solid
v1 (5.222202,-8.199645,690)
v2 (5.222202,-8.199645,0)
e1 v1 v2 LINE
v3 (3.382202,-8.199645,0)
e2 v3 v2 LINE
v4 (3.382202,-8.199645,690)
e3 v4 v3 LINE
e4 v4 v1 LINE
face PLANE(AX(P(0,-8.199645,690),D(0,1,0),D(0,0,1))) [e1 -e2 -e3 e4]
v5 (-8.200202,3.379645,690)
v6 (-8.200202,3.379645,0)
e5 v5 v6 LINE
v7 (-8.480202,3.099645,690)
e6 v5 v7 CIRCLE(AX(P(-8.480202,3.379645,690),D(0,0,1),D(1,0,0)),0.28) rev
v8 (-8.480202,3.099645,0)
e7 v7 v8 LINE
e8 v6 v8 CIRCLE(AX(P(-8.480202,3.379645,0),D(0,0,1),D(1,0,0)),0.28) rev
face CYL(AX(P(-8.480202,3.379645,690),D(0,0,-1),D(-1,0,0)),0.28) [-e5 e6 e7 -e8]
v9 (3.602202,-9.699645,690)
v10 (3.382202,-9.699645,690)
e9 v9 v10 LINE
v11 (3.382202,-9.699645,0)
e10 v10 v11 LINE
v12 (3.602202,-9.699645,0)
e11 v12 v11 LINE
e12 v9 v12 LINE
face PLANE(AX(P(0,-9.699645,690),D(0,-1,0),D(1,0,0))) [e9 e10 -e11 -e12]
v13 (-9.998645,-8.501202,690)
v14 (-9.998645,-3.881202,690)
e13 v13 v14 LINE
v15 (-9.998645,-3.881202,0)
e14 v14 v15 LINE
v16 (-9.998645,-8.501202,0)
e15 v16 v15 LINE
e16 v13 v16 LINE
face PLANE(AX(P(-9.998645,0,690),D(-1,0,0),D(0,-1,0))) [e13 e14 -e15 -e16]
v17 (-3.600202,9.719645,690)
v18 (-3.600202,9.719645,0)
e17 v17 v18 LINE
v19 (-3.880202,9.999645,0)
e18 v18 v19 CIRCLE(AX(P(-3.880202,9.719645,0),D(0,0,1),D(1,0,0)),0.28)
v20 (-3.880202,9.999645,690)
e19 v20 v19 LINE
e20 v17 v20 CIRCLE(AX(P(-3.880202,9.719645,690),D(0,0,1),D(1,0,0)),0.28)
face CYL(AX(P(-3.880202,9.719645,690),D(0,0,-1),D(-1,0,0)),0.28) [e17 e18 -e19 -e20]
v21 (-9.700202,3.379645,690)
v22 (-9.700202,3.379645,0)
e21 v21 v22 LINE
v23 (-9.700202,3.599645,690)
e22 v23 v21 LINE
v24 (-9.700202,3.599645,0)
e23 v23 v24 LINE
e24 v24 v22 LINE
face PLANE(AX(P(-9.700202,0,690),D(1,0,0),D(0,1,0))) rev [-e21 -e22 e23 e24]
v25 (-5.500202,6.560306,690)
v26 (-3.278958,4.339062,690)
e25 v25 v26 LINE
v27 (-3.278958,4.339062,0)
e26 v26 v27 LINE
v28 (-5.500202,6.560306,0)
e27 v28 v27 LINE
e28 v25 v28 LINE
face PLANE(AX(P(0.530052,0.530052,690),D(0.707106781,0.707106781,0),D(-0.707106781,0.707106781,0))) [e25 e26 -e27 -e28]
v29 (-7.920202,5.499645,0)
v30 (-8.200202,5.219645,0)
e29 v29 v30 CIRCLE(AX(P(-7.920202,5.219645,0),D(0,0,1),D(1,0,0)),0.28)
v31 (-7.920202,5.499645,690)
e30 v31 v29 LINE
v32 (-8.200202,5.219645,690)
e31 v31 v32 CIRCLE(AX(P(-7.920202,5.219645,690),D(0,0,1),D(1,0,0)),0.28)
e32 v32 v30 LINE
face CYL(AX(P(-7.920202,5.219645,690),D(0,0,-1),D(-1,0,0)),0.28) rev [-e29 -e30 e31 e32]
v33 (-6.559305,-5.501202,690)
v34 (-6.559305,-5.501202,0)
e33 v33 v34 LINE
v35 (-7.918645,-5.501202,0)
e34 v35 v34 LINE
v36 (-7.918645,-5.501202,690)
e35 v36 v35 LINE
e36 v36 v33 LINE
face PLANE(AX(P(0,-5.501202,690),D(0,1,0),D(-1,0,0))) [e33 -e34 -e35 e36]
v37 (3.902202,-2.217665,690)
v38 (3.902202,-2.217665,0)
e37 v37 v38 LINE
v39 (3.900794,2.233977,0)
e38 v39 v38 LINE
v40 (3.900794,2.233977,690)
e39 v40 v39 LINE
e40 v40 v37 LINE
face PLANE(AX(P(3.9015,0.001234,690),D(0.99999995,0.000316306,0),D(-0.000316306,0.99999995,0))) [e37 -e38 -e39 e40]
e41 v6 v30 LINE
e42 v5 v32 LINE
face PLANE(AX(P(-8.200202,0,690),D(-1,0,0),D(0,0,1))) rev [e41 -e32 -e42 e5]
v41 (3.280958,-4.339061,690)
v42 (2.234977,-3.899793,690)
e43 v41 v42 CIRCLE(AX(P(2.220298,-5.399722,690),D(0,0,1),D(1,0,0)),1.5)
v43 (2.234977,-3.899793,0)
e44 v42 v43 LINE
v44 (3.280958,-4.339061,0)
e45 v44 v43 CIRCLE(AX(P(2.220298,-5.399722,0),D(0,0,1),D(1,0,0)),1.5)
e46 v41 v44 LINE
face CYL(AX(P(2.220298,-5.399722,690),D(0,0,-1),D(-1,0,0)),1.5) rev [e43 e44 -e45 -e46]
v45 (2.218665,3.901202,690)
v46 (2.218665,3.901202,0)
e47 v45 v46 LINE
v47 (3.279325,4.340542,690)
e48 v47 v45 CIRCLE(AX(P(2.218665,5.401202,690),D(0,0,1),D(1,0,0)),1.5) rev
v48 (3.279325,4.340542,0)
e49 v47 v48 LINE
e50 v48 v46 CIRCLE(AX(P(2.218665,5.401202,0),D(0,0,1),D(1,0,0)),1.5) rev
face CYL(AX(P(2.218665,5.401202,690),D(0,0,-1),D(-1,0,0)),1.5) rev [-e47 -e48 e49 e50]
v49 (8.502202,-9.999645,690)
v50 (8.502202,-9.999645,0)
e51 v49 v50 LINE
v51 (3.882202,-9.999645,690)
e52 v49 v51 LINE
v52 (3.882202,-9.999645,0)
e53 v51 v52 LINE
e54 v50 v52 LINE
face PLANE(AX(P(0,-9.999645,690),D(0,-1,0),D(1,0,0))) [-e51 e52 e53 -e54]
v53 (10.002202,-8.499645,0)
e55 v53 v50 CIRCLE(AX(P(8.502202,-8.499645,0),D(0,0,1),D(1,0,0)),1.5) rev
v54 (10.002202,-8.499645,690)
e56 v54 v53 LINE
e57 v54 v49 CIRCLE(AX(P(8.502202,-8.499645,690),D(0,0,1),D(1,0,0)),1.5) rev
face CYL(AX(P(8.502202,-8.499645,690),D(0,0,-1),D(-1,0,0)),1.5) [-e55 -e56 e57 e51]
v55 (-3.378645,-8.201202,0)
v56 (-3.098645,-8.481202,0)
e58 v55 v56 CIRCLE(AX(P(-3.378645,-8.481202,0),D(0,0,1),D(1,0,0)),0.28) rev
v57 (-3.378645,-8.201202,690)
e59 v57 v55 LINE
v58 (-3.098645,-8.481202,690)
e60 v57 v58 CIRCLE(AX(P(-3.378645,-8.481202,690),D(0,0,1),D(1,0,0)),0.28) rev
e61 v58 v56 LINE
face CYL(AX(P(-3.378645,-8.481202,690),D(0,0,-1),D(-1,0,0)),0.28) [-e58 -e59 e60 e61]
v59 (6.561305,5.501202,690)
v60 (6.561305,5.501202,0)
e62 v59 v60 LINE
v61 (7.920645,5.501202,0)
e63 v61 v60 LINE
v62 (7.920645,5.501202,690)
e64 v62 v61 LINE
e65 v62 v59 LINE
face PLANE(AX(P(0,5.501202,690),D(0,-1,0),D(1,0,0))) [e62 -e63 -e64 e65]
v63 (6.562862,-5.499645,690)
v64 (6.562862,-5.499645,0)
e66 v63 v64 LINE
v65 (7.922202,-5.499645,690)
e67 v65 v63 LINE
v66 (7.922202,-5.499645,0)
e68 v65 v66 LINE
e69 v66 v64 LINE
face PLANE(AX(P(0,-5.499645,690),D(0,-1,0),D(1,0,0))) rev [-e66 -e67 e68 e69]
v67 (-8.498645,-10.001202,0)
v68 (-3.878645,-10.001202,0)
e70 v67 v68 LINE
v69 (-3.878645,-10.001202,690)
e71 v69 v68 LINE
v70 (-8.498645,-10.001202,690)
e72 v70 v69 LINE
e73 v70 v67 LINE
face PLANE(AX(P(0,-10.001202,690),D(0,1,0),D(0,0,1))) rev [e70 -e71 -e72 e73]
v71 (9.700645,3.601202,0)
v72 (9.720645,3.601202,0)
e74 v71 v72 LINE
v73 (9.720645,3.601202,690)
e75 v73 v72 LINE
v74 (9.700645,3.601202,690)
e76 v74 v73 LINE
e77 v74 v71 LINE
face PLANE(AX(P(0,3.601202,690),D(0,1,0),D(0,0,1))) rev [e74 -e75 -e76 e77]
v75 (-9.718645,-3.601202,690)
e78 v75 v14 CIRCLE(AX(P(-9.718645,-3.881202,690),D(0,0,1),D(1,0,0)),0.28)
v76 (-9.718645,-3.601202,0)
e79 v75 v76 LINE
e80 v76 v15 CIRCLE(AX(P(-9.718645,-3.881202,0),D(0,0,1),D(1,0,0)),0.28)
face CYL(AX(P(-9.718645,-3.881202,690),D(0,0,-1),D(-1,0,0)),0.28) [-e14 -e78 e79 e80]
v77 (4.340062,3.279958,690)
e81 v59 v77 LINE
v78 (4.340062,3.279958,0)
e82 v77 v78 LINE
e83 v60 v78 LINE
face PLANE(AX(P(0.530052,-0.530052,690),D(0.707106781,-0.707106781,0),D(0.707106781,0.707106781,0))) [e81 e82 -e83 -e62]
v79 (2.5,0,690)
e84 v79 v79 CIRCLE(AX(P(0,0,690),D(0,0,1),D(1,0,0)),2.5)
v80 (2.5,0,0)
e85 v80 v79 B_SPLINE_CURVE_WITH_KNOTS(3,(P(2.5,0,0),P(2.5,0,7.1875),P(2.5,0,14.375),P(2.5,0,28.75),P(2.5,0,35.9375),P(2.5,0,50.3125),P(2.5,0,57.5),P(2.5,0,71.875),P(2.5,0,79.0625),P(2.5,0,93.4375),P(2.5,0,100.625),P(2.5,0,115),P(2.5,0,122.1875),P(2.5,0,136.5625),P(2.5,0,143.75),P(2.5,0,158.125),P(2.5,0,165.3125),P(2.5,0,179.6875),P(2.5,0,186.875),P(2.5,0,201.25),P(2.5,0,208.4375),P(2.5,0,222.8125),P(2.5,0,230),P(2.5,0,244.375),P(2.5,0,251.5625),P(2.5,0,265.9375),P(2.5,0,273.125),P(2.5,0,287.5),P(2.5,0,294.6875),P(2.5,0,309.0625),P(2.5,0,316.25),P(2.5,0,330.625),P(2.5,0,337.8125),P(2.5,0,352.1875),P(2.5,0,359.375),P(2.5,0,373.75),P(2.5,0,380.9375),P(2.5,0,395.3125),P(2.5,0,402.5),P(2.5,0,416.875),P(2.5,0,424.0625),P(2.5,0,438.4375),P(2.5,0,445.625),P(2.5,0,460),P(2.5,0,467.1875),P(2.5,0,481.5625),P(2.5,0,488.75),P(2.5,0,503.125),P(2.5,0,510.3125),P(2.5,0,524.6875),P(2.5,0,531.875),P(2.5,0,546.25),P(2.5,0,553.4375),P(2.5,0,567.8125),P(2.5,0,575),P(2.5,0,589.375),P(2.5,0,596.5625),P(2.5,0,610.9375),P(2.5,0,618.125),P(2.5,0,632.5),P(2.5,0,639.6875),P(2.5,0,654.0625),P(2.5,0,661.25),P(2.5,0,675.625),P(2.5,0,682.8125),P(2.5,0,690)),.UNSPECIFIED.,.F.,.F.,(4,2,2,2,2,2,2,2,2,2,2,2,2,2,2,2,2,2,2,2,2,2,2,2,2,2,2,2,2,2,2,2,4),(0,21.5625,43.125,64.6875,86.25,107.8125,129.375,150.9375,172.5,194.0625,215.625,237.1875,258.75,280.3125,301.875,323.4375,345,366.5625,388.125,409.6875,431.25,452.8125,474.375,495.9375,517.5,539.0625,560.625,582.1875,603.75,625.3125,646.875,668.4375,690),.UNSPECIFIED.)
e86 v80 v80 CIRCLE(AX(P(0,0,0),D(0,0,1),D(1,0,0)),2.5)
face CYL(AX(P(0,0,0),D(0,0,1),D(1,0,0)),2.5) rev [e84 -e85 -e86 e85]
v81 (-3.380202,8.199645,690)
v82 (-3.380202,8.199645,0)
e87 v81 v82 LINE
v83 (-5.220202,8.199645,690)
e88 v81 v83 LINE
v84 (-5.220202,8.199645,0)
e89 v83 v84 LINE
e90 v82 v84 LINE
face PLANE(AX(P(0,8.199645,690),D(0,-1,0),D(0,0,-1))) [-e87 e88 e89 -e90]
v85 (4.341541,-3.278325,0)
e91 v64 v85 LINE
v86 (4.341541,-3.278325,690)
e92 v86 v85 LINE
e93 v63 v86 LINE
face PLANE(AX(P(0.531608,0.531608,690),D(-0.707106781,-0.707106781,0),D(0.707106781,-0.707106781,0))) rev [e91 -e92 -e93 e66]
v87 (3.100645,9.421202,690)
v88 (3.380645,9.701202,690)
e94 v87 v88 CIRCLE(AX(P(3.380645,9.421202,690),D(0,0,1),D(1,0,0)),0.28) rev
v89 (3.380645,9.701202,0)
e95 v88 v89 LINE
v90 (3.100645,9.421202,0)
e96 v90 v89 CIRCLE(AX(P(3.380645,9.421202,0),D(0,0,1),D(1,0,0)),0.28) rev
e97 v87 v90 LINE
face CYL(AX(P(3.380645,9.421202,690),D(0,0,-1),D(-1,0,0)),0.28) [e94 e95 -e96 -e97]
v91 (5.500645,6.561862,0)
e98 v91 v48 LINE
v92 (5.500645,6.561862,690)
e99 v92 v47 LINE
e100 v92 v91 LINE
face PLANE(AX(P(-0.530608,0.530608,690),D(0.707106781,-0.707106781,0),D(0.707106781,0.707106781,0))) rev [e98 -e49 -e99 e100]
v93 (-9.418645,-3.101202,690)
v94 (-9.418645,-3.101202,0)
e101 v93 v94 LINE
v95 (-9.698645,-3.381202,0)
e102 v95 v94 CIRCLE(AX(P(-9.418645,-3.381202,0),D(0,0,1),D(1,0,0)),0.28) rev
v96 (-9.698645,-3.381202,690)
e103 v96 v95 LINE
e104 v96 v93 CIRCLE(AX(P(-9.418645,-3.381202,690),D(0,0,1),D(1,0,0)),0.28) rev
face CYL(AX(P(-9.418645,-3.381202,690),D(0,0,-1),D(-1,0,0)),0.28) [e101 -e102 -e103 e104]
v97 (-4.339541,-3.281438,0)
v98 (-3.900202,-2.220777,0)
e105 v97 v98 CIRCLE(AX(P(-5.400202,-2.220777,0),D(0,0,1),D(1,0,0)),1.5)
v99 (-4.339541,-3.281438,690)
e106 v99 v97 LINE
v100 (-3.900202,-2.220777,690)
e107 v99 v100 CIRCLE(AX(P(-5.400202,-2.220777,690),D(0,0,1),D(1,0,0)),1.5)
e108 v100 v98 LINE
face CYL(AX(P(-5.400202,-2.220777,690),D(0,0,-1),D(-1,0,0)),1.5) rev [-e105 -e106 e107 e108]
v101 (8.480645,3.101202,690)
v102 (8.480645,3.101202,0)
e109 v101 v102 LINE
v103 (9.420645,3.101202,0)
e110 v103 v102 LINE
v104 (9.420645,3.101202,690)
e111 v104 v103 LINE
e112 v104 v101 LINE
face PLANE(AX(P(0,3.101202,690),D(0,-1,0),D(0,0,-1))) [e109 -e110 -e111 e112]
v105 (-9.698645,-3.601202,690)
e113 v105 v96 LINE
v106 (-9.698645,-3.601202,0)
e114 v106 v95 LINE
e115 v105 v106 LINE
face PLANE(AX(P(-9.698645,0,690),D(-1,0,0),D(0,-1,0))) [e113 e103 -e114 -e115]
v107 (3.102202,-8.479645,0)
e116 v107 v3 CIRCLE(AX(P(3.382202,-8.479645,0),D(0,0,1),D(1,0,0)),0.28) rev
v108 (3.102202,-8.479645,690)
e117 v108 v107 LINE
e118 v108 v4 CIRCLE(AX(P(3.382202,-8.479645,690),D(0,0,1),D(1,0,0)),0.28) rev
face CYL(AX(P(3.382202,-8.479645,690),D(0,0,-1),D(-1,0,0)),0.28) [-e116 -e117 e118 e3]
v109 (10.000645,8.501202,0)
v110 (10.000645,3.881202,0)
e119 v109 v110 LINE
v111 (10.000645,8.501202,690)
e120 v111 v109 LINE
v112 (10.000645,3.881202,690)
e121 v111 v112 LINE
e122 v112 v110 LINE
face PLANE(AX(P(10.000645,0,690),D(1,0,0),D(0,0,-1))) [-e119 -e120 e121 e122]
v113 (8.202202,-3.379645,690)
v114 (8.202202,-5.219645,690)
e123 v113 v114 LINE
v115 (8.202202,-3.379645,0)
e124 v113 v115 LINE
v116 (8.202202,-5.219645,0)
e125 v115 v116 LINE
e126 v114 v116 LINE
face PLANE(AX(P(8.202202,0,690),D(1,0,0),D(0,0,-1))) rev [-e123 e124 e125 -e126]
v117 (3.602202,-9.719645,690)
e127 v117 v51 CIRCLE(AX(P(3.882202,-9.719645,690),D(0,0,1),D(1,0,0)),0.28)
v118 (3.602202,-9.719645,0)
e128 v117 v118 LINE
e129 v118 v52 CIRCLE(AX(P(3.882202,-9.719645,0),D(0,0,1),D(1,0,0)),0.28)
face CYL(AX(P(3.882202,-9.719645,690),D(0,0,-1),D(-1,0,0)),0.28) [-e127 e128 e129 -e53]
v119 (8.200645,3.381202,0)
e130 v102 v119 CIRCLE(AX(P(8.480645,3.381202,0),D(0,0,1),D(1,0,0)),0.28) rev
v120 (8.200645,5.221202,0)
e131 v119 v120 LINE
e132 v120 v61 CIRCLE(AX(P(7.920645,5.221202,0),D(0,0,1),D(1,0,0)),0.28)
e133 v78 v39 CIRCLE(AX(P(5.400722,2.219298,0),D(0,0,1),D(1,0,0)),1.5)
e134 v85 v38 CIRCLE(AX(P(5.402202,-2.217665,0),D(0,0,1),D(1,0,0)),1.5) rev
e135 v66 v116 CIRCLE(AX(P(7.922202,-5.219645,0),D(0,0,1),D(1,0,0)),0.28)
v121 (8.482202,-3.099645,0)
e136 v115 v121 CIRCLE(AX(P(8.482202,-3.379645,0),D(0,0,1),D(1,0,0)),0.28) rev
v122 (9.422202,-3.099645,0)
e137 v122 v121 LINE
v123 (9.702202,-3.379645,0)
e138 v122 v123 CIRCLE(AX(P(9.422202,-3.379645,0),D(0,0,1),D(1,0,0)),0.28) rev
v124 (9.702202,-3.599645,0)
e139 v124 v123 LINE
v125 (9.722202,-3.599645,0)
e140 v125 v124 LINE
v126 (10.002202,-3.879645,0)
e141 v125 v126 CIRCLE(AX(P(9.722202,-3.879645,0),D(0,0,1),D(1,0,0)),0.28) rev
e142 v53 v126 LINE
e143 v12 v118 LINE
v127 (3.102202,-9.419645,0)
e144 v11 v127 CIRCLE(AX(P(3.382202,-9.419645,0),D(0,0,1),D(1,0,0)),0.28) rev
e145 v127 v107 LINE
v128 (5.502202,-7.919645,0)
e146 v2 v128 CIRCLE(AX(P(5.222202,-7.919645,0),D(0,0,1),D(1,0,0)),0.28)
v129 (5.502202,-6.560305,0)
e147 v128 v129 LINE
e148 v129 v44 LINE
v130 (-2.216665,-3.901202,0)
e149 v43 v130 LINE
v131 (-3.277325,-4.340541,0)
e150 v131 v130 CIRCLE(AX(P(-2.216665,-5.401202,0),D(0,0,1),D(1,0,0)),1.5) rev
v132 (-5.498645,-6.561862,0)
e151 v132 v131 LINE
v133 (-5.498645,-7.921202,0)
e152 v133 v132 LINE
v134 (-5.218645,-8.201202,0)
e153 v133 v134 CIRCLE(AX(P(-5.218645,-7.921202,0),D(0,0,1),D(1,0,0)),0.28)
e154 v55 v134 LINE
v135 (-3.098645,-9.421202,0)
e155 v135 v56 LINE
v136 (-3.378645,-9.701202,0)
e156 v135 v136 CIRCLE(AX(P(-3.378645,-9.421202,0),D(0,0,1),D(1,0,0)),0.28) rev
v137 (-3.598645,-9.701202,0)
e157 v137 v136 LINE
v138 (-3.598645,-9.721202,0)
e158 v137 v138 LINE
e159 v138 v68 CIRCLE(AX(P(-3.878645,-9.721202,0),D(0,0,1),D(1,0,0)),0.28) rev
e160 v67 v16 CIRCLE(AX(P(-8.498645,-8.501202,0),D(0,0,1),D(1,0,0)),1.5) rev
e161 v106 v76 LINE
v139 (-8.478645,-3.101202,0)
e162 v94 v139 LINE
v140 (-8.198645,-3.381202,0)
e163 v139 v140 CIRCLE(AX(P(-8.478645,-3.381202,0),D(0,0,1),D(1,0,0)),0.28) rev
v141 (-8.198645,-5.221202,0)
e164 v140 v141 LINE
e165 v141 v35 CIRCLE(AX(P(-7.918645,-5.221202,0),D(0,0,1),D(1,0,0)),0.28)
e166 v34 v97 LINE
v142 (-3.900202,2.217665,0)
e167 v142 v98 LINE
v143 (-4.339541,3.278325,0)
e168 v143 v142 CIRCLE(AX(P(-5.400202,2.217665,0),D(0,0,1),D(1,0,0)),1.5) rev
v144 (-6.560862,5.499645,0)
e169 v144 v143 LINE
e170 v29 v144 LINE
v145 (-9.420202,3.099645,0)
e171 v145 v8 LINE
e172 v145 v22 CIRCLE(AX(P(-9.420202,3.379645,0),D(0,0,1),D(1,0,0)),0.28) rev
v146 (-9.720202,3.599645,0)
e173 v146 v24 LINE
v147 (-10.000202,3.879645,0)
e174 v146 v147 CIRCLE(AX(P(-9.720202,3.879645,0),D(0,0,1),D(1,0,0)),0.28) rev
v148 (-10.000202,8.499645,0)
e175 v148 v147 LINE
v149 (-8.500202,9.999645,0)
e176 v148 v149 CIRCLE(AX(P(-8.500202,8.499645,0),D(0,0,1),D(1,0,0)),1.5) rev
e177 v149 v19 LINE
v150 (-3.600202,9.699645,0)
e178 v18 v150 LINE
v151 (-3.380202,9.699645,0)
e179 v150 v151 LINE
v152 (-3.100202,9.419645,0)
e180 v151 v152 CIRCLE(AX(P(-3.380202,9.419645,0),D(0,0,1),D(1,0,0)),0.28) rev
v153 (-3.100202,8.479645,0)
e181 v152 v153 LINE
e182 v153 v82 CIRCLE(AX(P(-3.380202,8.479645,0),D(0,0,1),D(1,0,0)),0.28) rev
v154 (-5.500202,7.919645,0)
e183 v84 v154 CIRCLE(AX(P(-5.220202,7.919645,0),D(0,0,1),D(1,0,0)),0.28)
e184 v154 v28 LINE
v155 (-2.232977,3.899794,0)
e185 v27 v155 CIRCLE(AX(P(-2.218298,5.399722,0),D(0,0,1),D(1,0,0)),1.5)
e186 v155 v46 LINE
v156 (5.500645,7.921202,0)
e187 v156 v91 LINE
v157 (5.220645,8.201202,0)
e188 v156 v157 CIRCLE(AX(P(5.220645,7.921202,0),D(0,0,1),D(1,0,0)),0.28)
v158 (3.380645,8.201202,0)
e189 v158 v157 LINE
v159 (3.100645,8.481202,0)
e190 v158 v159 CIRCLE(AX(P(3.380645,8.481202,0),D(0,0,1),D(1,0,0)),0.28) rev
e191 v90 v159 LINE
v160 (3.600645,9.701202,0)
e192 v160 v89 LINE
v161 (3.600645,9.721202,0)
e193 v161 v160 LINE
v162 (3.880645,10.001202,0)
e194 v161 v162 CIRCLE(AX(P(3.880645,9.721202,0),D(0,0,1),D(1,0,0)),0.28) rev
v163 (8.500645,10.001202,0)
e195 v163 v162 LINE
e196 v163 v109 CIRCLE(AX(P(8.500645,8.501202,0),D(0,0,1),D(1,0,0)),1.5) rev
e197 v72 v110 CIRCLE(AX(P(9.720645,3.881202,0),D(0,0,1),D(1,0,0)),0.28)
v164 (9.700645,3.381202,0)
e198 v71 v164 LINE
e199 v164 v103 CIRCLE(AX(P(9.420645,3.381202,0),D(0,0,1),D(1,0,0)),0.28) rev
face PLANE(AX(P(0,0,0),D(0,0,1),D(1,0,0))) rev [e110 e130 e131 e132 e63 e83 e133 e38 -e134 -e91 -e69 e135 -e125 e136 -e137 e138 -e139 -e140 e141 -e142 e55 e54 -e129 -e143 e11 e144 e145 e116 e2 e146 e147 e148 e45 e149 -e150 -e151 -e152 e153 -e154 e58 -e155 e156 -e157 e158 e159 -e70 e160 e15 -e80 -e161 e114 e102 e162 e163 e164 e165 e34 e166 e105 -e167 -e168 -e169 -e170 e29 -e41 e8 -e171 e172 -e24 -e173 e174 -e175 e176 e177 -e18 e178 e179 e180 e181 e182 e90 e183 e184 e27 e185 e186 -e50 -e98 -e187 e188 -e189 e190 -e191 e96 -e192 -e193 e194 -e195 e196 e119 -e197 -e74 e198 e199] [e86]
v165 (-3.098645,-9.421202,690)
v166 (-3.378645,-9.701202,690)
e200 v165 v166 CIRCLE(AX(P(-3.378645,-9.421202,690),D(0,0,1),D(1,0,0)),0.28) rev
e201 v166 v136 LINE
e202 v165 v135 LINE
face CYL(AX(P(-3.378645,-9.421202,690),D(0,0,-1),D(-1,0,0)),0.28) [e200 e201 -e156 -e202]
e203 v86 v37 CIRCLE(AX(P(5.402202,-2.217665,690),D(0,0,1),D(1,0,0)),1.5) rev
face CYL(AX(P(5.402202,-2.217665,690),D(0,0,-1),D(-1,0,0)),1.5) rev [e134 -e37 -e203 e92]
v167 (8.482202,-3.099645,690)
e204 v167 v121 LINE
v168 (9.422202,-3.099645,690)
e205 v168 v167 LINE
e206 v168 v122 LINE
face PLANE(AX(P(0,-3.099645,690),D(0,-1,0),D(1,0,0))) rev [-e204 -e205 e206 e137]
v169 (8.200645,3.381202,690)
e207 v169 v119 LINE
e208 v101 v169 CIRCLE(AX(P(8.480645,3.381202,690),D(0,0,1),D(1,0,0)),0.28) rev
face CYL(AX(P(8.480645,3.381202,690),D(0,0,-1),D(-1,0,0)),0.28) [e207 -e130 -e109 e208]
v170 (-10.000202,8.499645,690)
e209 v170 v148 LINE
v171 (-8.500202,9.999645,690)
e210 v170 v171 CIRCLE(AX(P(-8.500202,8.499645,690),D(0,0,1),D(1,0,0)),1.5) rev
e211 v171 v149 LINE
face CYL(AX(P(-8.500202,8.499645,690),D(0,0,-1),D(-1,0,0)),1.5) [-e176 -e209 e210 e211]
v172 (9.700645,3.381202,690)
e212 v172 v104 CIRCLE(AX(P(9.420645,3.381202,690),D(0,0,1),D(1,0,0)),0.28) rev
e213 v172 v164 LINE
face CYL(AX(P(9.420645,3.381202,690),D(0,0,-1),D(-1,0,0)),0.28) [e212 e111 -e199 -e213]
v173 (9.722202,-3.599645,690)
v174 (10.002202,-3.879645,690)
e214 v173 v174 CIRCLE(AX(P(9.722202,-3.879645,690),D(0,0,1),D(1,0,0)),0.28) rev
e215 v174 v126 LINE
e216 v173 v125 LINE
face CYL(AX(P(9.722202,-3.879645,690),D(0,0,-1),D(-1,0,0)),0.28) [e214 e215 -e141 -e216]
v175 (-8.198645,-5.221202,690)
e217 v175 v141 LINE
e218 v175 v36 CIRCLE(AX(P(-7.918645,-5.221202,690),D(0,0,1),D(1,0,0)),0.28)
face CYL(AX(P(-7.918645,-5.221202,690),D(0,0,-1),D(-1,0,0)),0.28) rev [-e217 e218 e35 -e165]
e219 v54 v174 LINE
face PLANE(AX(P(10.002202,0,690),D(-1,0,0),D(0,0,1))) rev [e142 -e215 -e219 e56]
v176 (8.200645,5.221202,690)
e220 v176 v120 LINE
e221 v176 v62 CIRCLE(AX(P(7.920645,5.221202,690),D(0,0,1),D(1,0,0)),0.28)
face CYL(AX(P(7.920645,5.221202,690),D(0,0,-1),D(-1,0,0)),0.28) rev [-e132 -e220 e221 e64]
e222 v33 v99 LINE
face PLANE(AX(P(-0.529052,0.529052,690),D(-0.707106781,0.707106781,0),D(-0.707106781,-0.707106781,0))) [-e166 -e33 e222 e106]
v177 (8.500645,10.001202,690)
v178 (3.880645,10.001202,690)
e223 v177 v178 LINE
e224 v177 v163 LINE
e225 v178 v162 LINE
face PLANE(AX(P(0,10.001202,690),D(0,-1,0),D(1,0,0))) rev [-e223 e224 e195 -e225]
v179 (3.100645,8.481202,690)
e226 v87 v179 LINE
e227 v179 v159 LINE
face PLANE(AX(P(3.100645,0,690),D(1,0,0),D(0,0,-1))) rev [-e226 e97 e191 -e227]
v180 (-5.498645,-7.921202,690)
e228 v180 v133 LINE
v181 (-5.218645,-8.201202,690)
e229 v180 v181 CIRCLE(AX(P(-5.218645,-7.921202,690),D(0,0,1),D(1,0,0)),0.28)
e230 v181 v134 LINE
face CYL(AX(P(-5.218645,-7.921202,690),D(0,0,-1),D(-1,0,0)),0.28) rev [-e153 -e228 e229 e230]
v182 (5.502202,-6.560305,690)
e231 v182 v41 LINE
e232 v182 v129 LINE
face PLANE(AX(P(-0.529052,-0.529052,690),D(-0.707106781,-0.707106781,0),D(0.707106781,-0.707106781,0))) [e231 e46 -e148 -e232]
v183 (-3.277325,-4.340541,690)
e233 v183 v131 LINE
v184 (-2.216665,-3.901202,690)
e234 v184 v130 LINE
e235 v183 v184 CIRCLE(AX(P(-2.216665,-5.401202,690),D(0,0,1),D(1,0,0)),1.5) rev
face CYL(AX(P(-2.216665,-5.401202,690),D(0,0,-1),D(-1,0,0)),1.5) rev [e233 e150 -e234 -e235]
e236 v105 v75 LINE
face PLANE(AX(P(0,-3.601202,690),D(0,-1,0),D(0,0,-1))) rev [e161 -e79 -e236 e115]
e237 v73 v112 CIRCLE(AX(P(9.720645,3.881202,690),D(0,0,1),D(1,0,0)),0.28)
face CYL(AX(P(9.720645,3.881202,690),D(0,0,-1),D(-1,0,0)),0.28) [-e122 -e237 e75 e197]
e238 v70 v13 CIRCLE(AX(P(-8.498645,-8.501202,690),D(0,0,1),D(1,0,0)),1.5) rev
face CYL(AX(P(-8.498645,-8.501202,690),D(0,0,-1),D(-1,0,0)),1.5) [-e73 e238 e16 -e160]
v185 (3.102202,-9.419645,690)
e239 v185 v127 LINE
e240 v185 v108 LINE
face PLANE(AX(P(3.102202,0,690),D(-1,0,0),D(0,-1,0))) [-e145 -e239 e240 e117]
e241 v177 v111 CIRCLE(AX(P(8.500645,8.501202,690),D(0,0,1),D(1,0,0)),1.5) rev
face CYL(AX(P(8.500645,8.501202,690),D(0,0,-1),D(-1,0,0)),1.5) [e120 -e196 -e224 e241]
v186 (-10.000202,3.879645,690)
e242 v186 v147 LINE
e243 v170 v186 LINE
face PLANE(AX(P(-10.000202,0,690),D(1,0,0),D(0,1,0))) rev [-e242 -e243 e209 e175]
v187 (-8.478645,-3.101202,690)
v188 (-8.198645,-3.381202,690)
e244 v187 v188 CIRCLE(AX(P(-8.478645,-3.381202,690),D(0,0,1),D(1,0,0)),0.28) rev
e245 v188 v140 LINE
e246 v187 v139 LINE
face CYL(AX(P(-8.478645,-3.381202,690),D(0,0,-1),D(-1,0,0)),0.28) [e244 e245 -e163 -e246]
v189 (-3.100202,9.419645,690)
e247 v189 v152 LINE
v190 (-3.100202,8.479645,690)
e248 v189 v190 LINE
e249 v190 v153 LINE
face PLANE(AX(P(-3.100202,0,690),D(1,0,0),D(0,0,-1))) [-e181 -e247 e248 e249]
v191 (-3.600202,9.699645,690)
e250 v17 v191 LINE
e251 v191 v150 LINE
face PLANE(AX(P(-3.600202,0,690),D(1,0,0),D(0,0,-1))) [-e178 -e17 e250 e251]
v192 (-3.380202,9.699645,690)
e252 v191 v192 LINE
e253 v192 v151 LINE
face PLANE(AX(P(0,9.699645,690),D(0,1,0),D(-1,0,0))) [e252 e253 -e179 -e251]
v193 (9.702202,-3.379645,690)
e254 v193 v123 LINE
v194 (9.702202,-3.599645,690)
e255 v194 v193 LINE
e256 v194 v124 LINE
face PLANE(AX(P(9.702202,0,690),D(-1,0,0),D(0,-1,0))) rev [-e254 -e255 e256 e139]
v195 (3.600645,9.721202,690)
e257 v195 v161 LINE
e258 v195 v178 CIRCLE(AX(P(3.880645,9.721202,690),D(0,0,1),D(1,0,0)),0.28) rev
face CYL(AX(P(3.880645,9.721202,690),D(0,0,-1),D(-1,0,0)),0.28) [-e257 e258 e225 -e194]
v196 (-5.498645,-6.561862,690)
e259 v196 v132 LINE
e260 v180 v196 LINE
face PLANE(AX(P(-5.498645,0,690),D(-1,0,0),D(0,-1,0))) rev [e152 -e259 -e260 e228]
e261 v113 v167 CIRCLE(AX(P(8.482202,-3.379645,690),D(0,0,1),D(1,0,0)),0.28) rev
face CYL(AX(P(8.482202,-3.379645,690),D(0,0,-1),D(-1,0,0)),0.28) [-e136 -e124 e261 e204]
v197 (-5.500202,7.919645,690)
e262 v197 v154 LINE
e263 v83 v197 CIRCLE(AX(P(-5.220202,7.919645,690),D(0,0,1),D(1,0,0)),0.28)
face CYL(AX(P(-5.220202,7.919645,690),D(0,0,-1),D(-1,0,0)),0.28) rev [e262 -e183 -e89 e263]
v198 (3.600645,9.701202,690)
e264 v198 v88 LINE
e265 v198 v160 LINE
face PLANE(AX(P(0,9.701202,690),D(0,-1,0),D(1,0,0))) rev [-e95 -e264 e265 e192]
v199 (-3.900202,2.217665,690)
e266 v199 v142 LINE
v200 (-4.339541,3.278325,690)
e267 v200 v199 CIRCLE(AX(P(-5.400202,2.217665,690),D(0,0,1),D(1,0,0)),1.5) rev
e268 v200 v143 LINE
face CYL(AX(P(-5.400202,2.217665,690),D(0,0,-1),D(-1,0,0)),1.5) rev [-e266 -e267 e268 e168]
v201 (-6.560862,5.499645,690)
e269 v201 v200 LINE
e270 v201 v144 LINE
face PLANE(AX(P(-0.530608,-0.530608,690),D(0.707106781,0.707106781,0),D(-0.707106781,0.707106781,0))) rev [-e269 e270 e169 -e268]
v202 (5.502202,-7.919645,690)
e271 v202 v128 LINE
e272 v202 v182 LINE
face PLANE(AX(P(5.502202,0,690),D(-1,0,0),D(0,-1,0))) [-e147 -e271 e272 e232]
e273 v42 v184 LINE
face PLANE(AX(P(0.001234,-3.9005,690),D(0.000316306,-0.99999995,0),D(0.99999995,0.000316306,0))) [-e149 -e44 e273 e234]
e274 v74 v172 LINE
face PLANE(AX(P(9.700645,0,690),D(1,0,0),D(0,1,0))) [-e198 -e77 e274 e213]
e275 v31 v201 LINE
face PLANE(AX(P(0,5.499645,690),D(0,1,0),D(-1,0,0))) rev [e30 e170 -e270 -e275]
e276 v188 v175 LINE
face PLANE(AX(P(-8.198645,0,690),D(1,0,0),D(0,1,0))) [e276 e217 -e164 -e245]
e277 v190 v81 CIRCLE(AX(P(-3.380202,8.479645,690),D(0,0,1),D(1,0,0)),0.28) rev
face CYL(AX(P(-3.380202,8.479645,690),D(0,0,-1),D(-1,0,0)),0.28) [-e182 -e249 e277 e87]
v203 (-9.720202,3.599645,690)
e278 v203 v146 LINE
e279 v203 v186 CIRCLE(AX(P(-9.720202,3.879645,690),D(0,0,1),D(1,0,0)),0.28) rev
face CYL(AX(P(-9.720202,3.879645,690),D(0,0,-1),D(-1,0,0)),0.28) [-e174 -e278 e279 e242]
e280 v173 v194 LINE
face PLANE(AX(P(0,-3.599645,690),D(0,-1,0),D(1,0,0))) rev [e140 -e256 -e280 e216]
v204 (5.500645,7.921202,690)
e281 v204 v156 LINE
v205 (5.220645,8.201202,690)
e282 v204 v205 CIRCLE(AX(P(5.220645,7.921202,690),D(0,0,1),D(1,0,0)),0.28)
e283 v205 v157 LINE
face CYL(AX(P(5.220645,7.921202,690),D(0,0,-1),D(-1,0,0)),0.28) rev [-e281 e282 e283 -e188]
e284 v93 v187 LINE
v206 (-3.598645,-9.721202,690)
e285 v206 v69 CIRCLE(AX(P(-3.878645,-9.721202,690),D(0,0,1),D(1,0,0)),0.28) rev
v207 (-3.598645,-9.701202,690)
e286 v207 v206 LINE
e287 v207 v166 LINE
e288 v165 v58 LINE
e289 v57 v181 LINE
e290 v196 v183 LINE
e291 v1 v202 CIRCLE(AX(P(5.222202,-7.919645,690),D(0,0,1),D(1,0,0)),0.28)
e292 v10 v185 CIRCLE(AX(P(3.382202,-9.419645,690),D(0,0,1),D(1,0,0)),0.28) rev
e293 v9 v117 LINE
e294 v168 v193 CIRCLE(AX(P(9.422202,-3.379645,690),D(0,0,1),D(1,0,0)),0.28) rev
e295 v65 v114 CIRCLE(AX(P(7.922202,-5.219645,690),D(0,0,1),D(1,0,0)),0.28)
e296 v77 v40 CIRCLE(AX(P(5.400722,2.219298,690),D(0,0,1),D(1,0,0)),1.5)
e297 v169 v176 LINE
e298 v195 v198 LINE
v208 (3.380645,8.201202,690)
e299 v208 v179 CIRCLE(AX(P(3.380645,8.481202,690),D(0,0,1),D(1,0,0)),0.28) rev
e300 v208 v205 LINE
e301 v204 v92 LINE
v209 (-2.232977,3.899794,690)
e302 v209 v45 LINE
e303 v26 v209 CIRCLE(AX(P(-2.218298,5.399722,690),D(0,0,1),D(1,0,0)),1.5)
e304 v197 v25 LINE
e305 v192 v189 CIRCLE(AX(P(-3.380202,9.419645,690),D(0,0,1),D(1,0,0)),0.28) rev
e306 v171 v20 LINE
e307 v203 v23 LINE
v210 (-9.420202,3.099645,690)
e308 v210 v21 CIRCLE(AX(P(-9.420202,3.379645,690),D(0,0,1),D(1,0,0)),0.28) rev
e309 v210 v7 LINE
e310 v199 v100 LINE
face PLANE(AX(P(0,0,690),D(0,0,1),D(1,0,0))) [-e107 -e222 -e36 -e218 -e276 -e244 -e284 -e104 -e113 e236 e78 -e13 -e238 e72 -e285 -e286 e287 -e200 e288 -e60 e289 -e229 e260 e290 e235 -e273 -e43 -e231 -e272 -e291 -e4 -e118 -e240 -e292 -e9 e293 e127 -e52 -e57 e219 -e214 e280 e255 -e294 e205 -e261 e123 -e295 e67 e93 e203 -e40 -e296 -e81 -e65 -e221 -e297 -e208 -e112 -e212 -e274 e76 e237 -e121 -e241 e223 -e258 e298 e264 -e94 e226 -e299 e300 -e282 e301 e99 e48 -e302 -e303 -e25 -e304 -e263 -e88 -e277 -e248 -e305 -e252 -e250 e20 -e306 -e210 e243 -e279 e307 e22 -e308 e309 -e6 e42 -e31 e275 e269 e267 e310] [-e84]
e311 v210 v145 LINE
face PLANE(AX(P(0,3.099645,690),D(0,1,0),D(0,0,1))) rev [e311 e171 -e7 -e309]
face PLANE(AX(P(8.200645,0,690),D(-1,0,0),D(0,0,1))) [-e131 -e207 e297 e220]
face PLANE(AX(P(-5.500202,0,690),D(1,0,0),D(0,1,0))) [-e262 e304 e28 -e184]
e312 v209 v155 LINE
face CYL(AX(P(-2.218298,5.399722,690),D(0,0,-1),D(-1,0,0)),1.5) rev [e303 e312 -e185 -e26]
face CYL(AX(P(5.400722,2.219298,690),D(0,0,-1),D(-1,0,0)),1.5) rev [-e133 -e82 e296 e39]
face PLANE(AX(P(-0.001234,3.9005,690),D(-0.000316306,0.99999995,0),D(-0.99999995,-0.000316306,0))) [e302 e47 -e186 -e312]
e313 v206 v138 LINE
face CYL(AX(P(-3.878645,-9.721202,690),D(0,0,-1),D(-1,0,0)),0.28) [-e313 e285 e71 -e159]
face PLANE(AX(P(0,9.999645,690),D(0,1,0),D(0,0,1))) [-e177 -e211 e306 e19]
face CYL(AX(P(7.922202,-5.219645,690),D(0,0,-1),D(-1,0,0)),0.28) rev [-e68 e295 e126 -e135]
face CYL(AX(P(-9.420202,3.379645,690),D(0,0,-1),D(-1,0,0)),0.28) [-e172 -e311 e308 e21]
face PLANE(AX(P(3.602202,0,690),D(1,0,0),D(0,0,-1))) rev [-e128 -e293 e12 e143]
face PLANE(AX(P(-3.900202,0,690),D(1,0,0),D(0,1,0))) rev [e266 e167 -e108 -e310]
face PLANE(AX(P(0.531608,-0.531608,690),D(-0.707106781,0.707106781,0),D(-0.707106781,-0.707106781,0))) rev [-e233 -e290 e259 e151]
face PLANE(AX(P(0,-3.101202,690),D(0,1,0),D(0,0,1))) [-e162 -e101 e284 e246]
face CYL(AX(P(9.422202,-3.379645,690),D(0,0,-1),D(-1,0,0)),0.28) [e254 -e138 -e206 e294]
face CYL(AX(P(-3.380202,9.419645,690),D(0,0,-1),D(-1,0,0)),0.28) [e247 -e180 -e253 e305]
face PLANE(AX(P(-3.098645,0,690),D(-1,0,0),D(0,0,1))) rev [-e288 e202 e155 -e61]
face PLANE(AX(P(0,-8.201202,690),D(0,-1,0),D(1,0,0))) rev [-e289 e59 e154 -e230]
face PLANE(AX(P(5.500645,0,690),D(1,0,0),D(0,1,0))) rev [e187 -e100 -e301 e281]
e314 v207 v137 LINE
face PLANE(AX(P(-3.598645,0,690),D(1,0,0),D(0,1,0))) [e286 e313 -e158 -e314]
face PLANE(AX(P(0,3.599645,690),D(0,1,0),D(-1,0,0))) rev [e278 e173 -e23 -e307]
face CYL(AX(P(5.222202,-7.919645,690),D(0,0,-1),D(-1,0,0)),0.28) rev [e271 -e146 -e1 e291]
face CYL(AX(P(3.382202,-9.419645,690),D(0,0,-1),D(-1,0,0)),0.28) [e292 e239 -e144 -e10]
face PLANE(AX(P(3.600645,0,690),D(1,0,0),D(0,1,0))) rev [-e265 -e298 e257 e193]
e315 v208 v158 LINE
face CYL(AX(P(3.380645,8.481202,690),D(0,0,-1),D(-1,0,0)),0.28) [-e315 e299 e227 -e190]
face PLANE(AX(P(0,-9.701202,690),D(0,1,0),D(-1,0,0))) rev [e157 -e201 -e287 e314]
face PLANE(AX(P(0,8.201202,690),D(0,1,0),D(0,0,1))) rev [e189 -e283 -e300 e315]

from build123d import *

# Parameters (mm, degrees)
BOSS_EXTRUDE1_DEPTH = 690
F_3DSKETCH2_R       = 2.5
CUT_EXTRUDE1_DEPTH  = 691.144961638


with BuildPart() as part:
    # Sketch1 → Boss-Extrude1 (new body)
    with BuildSketch(Plane.XY):
        with BuildLine():
            ThreePointArc((-4.339541497, 3.27832502), (-4.01438237, 2.791689997), (-3.900201668, 2.217664848))
            Line((-3.900201668, 2.217664848), (-3.900201668, -2.220777458))
            ThreePointArc((-3.900201668, -2.220777458), (-4.013982246, -2.793835668), (-4.338062619, -3.279956687))
            ThreePointArc((-4.338062619, -3.279956687), (-4.338801799, -3.280697416), (-4.339541497, -3.28143763))
            Line((-4.339541497, -3.28143763), (-6.559305445, -5.501201578))
            Line((-6.559305445, -5.501201578), (-7.918645273, -5.501201578))
            ThreePointArc((-7.918645273, -5.501201578), (-8.116635172, -5.419191476), (-8.198645273, -5.221201578))
            Line((-8.198645273, -5.221201578), (-8.198645273, -3.381201578))
            ThreePointArc((-8.198645273, -3.381201578), (-8.280655374, -3.183211679), (-8.478645273, -3.101201578))
            Line((-8.478645273, -3.101201578), (-9.418645273, -3.101201578))
            ThreePointArc((-9.418645273, -3.101201578), (-9.616635172, -3.183211679), (-9.698645273, -3.381201578))
            Line((-9.698645273, -3.381201578), (-9.698645273, -3.601201578))
            Line((-9.698645273, -3.601201578), (-9.718645273, -3.601201578))
            ThreePointArc((-9.718645273, -3.601201578), (-9.916635172, -3.683211679), (-9.998645273, -3.881201578))
            Line((-9.998645273, -3.881201578), (-9.998645273, -8.501201578))
            ThreePointArc((-9.998645273, -8.501201578), (-9.559305445, -9.561861749), (-8.498645273, -10.001201578))
            Line((-8.498645273, -10.001201578), (-3.878645273, -10.001201578))
            ThreePointArc((-3.878645273, -10.001201578), (-3.680655374, -9.919191476), (-3.598645273, -9.721201578))
            Line((-3.598645273, -9.721201578), (-3.598645273, -9.701201578))
            Line((-3.598645273, -9.701201578), (-3.378645273, -9.701201578))
            ThreePointArc((-3.378645273, -9.701201578), (-3.180655374, -9.619191476), (-3.098645273, -9.421201578))
            Line((-3.098645273, -9.421201578), (-3.098645273, -8.481201578))
            ThreePointArc((-3.098645273, -8.481201578), (-3.180655374, -8.283211679), (-3.378645273, -8.201201578))
            Line((-3.378645273, -8.201201578), (-5.218645273, -8.201201578))
            ThreePointArc((-5.218645273, -8.201201578), (-5.416635172, -8.119191476), (-5.498645273, -7.921201578))
            Line((-5.498645273, -7.921201578), (-5.498645273, -6.561861749))
            Line((-5.498645273, -6.561861749), (-3.277324929, -4.340541406))
            ThreePointArc((-3.277324929, -4.340541406), (-2.790689906, -4.015382279), (-2.216664757, -3.901201578))
            Line((-2.216664757, -3.901201578), (2.234977304, -3.899793498))
            ThreePointArc((2.234977304, -3.899793498), (2.801097117, -4.016727825), (3.280957809, -4.339061494))
            Line((3.280957809, -4.339061494), (5.502201668, -6.560305354))
            Line((5.502201668, -6.560305354), (5.502201668, -7.919645182))
            ThreePointArc((5.502201668, -7.919645182), (5.420191567, -8.117635081), (5.222201668, -8.199645182))
            Line((5.222201668, -8.199645182), (3.382201668, -8.199645182))
            ThreePointArc((3.382201668, -8.199645182), (3.18421177, -8.281655283), (3.102201668, -8.479645182))
            Line((3.102201668, -8.479645182), (3.102201668, -9.419645182))
            ThreePointArc((3.102201668, -9.419645182), (3.18421177, -9.617635081), (3.382201668, -9.699645182))
            Line((3.382201668, -9.699645182), (3.602201668, -9.699645182))
            Line((3.602201668, -9.699645182), (3.602201668, -9.719645182))
            ThreePointArc((3.602201668, -9.719645182), (3.68421177, -9.917635081), (3.882201668, -9.999645182))
            Line((3.882201668, -9.999645182), (8.502201668, -9.999645182))
            ThreePointArc((8.502201668, -9.999645182), (9.56286184, -9.560305354), (10.002201668, -8.499645182))
            Line((10.002201668, -8.499645182), (10.002201668, -3.879645182))
            ThreePointArc((10.002201668, -3.879645182), (9.920191567, -3.681655283), (9.722201668, -3.599645182))
            Line((9.722201668, -3.599645182), (9.702201668, -3.599645182))
            Line((9.702201668, -3.599645182), (9.702201668, -3.379645182))
            ThreePointArc((9.702201668, -3.379645182), (9.620191567, -3.181655283), (9.422201668, -3.099645182))
            Line((9.422201668, -3.099645182), (8.482201668, -3.099645182))
            ThreePointArc((8.482201668, -3.099645182), (8.28421177, -3.181655283), (8.202201668, -3.379645182))
            Line((8.202201668, -3.379645182), (8.202201668, -5.219645182))
            ThreePointArc((8.202201668, -5.219645182), (8.120191567, -5.417635081), (7.922201668, -5.499645182))
            Line((7.922201668, -5.499645182), (6.56286184, -5.499645182))
            Line((6.56286184, -5.499645182), (4.341541497, -3.278324838))
            ThreePointArc((4.341541497, -3.278324838), (4.01638237, -2.791689815), (3.902201668, -2.217664667))
            Line((3.902201668, -2.217664667), (3.900793589, 2.233977395))
            ThreePointArc((3.900793589, 2.233977395), (4.017727916, 2.800097207), (4.340061585, 3.2799579))
            Line((4.340061585, 3.2799579), (6.561305445, 5.501201759))
            Line((6.561305445, 5.501201759), (7.920645273, 5.501201759))
            ThreePointArc((7.920645273, 5.501201759), (8.118635172, 5.419191658), (8.200645273, 5.221201759))
            Line((8.200645273, 5.221201759), (8.200645273, 3.381201759))
            ThreePointArc((8.200645273, 3.381201759), (8.282655374, 3.183211861), (8.480645273, 3.101201759))
            Line((8.480645273, 3.101201759), (9.420645273, 3.101201759))
            ThreePointArc((9.420645273, 3.101201759), (9.618635172, 3.183211861), (9.700645273, 3.381201759))
            Line((9.700645273, 3.381201759), (9.700645273, 3.601201759))
            Line((9.700645273, 3.601201759), (9.720645273, 3.601201759))
            ThreePointArc((9.720645273, 3.601201759), (9.918635172, 3.683211861), (10.000645273, 3.881201759))
            Line((10.000645273, 3.881201759), (10.000645273, 8.501201759))
            ThreePointArc((10.000645273, 8.501201759), (9.561305445, 9.561861931), (8.500645273, 10.001201759))
            Line((8.500645273, 10.001201759), (3.880645273, 10.001201759))
            ThreePointArc((3.880645273, 10.001201759), (3.682655374, 9.919191658), (3.600645273, 9.721201759))
            Line((3.600645273, 9.721201759), (3.600645273, 9.701201759))
            Line((3.600645273, 9.701201759), (3.380645273, 9.701201759))
            ThreePointArc((3.380645273, 9.701201759), (3.182655374, 9.619191658), (3.100645273, 9.421201759))
            Line((3.100645273, 9.421201759), (3.100645273, 8.481201759))
            ThreePointArc((3.100645273, 8.481201759), (3.182655374, 8.283211861), (3.380645273, 8.201201759))
            Line((3.380645273, 8.201201759), (5.220645273, 8.201201759))
            ThreePointArc((5.220645273, 8.201201759), (5.418635172, 8.119191658), (5.500645273, 7.921201759))
            Line((5.500645273, 7.921201759), (5.500645273, 6.561861931))
            Line((5.500645273, 6.561861931), (3.279324929, 4.340541588))
            ThreePointArc((3.279324929, 4.340541588), (2.792689906, 4.015382461), (2.218664757, 3.901201759))
            Line((2.218664757, 3.901201759), (-2.232977304, 3.89979368))
            ThreePointArc((-2.232977304, 3.89979368), (-2.799097117, 4.016728006), (-3.278957809, 4.339061676))
            Line((-3.278957809, 4.339061676), (-5.500201668, 6.560305535))
            Line((-5.500201668, 6.560305535), (-5.500201668, 7.919645364))
            ThreePointArc((-5.500201668, 7.919645364), (-5.418191567, 8.117635262), (-5.220201668, 8.199645364))
            Line((-5.220201668, 8.199645364), (-3.380201668, 8.199645364))
            ThreePointArc((-3.380201668, 8.199645364), (-3.18221177, 8.281655465), (-3.100201668, 8.479645364))
            Line((-3.100201668, 8.479645364), (-3.100201668, 9.419645364))
            ThreePointArc((-3.100201668, 9.419645364), (-3.18221177, 9.617635262), (-3.380201668, 9.699645364))
            Line((-3.380201668, 9.699645364), (-3.600201668, 9.699645364))
            Line((-3.600201668, 9.699645364), (-3.600201668, 9.719645364))
            ThreePointArc((-3.600201668, 9.719645364), (-3.68221177, 9.917635262), (-3.880201668, 9.999645364))
            Line((-3.880201668, 9.999645364), (-8.500201668, 9.999645364))
            ThreePointArc((-8.500201668, 9.999645364), (-9.56086184, 9.560305535), (-10.000201668, 8.499645364))
            Line((-10.000201668, 8.499645364), (-10.000201668, 3.879645364))
            ThreePointArc((-10.000201668, 3.879645364), (-9.918191567, 3.681655465), (-9.720201668, 3.599645364))
            Line((-9.720201668, 3.599645364), (-9.700201668, 3.599645364))
            Line((-9.700201668, 3.599645364), (-9.700201668, 3.379645364))
            ThreePointArc((-9.700201668, 3.379645364), (-9.618191567, 3.181655465), (-9.420201668, 3.099645364))
            Line((-9.420201668, 3.099645364), (-8.480201668, 3.099645364))
            ThreePointArc((-8.480201668, 3.099645364), (-8.28221177, 3.181655465), (-8.200201668, 3.379645364))
            Line((-8.200201668, 3.379645364), (-8.200201668, 5.219645364))
            ThreePointArc((-8.200201668, 5.219645364), (-8.118191567, 5.417635262), (-7.920201668, 5.499645364))
            Line((-7.920201668, 5.499645364), (-6.56086184, 5.499645364))
            Line((-6.56086184, 5.499645364), (-4.339541497, 3.27832502))
        make_face()
    extrude(amount=BOSS_EXTRUDE1_DEPTH)

    # 3DSketch2 → Cut-Extrude1 (cut, through all)
    with BuildSketch(Plane.XY):
        Circle(F_3DSKETCH2_R)
    extrude(amount=CUT_EXTRUDE1_DEPTH, mode=Mode.SUBTRACT)


solid = part.part
